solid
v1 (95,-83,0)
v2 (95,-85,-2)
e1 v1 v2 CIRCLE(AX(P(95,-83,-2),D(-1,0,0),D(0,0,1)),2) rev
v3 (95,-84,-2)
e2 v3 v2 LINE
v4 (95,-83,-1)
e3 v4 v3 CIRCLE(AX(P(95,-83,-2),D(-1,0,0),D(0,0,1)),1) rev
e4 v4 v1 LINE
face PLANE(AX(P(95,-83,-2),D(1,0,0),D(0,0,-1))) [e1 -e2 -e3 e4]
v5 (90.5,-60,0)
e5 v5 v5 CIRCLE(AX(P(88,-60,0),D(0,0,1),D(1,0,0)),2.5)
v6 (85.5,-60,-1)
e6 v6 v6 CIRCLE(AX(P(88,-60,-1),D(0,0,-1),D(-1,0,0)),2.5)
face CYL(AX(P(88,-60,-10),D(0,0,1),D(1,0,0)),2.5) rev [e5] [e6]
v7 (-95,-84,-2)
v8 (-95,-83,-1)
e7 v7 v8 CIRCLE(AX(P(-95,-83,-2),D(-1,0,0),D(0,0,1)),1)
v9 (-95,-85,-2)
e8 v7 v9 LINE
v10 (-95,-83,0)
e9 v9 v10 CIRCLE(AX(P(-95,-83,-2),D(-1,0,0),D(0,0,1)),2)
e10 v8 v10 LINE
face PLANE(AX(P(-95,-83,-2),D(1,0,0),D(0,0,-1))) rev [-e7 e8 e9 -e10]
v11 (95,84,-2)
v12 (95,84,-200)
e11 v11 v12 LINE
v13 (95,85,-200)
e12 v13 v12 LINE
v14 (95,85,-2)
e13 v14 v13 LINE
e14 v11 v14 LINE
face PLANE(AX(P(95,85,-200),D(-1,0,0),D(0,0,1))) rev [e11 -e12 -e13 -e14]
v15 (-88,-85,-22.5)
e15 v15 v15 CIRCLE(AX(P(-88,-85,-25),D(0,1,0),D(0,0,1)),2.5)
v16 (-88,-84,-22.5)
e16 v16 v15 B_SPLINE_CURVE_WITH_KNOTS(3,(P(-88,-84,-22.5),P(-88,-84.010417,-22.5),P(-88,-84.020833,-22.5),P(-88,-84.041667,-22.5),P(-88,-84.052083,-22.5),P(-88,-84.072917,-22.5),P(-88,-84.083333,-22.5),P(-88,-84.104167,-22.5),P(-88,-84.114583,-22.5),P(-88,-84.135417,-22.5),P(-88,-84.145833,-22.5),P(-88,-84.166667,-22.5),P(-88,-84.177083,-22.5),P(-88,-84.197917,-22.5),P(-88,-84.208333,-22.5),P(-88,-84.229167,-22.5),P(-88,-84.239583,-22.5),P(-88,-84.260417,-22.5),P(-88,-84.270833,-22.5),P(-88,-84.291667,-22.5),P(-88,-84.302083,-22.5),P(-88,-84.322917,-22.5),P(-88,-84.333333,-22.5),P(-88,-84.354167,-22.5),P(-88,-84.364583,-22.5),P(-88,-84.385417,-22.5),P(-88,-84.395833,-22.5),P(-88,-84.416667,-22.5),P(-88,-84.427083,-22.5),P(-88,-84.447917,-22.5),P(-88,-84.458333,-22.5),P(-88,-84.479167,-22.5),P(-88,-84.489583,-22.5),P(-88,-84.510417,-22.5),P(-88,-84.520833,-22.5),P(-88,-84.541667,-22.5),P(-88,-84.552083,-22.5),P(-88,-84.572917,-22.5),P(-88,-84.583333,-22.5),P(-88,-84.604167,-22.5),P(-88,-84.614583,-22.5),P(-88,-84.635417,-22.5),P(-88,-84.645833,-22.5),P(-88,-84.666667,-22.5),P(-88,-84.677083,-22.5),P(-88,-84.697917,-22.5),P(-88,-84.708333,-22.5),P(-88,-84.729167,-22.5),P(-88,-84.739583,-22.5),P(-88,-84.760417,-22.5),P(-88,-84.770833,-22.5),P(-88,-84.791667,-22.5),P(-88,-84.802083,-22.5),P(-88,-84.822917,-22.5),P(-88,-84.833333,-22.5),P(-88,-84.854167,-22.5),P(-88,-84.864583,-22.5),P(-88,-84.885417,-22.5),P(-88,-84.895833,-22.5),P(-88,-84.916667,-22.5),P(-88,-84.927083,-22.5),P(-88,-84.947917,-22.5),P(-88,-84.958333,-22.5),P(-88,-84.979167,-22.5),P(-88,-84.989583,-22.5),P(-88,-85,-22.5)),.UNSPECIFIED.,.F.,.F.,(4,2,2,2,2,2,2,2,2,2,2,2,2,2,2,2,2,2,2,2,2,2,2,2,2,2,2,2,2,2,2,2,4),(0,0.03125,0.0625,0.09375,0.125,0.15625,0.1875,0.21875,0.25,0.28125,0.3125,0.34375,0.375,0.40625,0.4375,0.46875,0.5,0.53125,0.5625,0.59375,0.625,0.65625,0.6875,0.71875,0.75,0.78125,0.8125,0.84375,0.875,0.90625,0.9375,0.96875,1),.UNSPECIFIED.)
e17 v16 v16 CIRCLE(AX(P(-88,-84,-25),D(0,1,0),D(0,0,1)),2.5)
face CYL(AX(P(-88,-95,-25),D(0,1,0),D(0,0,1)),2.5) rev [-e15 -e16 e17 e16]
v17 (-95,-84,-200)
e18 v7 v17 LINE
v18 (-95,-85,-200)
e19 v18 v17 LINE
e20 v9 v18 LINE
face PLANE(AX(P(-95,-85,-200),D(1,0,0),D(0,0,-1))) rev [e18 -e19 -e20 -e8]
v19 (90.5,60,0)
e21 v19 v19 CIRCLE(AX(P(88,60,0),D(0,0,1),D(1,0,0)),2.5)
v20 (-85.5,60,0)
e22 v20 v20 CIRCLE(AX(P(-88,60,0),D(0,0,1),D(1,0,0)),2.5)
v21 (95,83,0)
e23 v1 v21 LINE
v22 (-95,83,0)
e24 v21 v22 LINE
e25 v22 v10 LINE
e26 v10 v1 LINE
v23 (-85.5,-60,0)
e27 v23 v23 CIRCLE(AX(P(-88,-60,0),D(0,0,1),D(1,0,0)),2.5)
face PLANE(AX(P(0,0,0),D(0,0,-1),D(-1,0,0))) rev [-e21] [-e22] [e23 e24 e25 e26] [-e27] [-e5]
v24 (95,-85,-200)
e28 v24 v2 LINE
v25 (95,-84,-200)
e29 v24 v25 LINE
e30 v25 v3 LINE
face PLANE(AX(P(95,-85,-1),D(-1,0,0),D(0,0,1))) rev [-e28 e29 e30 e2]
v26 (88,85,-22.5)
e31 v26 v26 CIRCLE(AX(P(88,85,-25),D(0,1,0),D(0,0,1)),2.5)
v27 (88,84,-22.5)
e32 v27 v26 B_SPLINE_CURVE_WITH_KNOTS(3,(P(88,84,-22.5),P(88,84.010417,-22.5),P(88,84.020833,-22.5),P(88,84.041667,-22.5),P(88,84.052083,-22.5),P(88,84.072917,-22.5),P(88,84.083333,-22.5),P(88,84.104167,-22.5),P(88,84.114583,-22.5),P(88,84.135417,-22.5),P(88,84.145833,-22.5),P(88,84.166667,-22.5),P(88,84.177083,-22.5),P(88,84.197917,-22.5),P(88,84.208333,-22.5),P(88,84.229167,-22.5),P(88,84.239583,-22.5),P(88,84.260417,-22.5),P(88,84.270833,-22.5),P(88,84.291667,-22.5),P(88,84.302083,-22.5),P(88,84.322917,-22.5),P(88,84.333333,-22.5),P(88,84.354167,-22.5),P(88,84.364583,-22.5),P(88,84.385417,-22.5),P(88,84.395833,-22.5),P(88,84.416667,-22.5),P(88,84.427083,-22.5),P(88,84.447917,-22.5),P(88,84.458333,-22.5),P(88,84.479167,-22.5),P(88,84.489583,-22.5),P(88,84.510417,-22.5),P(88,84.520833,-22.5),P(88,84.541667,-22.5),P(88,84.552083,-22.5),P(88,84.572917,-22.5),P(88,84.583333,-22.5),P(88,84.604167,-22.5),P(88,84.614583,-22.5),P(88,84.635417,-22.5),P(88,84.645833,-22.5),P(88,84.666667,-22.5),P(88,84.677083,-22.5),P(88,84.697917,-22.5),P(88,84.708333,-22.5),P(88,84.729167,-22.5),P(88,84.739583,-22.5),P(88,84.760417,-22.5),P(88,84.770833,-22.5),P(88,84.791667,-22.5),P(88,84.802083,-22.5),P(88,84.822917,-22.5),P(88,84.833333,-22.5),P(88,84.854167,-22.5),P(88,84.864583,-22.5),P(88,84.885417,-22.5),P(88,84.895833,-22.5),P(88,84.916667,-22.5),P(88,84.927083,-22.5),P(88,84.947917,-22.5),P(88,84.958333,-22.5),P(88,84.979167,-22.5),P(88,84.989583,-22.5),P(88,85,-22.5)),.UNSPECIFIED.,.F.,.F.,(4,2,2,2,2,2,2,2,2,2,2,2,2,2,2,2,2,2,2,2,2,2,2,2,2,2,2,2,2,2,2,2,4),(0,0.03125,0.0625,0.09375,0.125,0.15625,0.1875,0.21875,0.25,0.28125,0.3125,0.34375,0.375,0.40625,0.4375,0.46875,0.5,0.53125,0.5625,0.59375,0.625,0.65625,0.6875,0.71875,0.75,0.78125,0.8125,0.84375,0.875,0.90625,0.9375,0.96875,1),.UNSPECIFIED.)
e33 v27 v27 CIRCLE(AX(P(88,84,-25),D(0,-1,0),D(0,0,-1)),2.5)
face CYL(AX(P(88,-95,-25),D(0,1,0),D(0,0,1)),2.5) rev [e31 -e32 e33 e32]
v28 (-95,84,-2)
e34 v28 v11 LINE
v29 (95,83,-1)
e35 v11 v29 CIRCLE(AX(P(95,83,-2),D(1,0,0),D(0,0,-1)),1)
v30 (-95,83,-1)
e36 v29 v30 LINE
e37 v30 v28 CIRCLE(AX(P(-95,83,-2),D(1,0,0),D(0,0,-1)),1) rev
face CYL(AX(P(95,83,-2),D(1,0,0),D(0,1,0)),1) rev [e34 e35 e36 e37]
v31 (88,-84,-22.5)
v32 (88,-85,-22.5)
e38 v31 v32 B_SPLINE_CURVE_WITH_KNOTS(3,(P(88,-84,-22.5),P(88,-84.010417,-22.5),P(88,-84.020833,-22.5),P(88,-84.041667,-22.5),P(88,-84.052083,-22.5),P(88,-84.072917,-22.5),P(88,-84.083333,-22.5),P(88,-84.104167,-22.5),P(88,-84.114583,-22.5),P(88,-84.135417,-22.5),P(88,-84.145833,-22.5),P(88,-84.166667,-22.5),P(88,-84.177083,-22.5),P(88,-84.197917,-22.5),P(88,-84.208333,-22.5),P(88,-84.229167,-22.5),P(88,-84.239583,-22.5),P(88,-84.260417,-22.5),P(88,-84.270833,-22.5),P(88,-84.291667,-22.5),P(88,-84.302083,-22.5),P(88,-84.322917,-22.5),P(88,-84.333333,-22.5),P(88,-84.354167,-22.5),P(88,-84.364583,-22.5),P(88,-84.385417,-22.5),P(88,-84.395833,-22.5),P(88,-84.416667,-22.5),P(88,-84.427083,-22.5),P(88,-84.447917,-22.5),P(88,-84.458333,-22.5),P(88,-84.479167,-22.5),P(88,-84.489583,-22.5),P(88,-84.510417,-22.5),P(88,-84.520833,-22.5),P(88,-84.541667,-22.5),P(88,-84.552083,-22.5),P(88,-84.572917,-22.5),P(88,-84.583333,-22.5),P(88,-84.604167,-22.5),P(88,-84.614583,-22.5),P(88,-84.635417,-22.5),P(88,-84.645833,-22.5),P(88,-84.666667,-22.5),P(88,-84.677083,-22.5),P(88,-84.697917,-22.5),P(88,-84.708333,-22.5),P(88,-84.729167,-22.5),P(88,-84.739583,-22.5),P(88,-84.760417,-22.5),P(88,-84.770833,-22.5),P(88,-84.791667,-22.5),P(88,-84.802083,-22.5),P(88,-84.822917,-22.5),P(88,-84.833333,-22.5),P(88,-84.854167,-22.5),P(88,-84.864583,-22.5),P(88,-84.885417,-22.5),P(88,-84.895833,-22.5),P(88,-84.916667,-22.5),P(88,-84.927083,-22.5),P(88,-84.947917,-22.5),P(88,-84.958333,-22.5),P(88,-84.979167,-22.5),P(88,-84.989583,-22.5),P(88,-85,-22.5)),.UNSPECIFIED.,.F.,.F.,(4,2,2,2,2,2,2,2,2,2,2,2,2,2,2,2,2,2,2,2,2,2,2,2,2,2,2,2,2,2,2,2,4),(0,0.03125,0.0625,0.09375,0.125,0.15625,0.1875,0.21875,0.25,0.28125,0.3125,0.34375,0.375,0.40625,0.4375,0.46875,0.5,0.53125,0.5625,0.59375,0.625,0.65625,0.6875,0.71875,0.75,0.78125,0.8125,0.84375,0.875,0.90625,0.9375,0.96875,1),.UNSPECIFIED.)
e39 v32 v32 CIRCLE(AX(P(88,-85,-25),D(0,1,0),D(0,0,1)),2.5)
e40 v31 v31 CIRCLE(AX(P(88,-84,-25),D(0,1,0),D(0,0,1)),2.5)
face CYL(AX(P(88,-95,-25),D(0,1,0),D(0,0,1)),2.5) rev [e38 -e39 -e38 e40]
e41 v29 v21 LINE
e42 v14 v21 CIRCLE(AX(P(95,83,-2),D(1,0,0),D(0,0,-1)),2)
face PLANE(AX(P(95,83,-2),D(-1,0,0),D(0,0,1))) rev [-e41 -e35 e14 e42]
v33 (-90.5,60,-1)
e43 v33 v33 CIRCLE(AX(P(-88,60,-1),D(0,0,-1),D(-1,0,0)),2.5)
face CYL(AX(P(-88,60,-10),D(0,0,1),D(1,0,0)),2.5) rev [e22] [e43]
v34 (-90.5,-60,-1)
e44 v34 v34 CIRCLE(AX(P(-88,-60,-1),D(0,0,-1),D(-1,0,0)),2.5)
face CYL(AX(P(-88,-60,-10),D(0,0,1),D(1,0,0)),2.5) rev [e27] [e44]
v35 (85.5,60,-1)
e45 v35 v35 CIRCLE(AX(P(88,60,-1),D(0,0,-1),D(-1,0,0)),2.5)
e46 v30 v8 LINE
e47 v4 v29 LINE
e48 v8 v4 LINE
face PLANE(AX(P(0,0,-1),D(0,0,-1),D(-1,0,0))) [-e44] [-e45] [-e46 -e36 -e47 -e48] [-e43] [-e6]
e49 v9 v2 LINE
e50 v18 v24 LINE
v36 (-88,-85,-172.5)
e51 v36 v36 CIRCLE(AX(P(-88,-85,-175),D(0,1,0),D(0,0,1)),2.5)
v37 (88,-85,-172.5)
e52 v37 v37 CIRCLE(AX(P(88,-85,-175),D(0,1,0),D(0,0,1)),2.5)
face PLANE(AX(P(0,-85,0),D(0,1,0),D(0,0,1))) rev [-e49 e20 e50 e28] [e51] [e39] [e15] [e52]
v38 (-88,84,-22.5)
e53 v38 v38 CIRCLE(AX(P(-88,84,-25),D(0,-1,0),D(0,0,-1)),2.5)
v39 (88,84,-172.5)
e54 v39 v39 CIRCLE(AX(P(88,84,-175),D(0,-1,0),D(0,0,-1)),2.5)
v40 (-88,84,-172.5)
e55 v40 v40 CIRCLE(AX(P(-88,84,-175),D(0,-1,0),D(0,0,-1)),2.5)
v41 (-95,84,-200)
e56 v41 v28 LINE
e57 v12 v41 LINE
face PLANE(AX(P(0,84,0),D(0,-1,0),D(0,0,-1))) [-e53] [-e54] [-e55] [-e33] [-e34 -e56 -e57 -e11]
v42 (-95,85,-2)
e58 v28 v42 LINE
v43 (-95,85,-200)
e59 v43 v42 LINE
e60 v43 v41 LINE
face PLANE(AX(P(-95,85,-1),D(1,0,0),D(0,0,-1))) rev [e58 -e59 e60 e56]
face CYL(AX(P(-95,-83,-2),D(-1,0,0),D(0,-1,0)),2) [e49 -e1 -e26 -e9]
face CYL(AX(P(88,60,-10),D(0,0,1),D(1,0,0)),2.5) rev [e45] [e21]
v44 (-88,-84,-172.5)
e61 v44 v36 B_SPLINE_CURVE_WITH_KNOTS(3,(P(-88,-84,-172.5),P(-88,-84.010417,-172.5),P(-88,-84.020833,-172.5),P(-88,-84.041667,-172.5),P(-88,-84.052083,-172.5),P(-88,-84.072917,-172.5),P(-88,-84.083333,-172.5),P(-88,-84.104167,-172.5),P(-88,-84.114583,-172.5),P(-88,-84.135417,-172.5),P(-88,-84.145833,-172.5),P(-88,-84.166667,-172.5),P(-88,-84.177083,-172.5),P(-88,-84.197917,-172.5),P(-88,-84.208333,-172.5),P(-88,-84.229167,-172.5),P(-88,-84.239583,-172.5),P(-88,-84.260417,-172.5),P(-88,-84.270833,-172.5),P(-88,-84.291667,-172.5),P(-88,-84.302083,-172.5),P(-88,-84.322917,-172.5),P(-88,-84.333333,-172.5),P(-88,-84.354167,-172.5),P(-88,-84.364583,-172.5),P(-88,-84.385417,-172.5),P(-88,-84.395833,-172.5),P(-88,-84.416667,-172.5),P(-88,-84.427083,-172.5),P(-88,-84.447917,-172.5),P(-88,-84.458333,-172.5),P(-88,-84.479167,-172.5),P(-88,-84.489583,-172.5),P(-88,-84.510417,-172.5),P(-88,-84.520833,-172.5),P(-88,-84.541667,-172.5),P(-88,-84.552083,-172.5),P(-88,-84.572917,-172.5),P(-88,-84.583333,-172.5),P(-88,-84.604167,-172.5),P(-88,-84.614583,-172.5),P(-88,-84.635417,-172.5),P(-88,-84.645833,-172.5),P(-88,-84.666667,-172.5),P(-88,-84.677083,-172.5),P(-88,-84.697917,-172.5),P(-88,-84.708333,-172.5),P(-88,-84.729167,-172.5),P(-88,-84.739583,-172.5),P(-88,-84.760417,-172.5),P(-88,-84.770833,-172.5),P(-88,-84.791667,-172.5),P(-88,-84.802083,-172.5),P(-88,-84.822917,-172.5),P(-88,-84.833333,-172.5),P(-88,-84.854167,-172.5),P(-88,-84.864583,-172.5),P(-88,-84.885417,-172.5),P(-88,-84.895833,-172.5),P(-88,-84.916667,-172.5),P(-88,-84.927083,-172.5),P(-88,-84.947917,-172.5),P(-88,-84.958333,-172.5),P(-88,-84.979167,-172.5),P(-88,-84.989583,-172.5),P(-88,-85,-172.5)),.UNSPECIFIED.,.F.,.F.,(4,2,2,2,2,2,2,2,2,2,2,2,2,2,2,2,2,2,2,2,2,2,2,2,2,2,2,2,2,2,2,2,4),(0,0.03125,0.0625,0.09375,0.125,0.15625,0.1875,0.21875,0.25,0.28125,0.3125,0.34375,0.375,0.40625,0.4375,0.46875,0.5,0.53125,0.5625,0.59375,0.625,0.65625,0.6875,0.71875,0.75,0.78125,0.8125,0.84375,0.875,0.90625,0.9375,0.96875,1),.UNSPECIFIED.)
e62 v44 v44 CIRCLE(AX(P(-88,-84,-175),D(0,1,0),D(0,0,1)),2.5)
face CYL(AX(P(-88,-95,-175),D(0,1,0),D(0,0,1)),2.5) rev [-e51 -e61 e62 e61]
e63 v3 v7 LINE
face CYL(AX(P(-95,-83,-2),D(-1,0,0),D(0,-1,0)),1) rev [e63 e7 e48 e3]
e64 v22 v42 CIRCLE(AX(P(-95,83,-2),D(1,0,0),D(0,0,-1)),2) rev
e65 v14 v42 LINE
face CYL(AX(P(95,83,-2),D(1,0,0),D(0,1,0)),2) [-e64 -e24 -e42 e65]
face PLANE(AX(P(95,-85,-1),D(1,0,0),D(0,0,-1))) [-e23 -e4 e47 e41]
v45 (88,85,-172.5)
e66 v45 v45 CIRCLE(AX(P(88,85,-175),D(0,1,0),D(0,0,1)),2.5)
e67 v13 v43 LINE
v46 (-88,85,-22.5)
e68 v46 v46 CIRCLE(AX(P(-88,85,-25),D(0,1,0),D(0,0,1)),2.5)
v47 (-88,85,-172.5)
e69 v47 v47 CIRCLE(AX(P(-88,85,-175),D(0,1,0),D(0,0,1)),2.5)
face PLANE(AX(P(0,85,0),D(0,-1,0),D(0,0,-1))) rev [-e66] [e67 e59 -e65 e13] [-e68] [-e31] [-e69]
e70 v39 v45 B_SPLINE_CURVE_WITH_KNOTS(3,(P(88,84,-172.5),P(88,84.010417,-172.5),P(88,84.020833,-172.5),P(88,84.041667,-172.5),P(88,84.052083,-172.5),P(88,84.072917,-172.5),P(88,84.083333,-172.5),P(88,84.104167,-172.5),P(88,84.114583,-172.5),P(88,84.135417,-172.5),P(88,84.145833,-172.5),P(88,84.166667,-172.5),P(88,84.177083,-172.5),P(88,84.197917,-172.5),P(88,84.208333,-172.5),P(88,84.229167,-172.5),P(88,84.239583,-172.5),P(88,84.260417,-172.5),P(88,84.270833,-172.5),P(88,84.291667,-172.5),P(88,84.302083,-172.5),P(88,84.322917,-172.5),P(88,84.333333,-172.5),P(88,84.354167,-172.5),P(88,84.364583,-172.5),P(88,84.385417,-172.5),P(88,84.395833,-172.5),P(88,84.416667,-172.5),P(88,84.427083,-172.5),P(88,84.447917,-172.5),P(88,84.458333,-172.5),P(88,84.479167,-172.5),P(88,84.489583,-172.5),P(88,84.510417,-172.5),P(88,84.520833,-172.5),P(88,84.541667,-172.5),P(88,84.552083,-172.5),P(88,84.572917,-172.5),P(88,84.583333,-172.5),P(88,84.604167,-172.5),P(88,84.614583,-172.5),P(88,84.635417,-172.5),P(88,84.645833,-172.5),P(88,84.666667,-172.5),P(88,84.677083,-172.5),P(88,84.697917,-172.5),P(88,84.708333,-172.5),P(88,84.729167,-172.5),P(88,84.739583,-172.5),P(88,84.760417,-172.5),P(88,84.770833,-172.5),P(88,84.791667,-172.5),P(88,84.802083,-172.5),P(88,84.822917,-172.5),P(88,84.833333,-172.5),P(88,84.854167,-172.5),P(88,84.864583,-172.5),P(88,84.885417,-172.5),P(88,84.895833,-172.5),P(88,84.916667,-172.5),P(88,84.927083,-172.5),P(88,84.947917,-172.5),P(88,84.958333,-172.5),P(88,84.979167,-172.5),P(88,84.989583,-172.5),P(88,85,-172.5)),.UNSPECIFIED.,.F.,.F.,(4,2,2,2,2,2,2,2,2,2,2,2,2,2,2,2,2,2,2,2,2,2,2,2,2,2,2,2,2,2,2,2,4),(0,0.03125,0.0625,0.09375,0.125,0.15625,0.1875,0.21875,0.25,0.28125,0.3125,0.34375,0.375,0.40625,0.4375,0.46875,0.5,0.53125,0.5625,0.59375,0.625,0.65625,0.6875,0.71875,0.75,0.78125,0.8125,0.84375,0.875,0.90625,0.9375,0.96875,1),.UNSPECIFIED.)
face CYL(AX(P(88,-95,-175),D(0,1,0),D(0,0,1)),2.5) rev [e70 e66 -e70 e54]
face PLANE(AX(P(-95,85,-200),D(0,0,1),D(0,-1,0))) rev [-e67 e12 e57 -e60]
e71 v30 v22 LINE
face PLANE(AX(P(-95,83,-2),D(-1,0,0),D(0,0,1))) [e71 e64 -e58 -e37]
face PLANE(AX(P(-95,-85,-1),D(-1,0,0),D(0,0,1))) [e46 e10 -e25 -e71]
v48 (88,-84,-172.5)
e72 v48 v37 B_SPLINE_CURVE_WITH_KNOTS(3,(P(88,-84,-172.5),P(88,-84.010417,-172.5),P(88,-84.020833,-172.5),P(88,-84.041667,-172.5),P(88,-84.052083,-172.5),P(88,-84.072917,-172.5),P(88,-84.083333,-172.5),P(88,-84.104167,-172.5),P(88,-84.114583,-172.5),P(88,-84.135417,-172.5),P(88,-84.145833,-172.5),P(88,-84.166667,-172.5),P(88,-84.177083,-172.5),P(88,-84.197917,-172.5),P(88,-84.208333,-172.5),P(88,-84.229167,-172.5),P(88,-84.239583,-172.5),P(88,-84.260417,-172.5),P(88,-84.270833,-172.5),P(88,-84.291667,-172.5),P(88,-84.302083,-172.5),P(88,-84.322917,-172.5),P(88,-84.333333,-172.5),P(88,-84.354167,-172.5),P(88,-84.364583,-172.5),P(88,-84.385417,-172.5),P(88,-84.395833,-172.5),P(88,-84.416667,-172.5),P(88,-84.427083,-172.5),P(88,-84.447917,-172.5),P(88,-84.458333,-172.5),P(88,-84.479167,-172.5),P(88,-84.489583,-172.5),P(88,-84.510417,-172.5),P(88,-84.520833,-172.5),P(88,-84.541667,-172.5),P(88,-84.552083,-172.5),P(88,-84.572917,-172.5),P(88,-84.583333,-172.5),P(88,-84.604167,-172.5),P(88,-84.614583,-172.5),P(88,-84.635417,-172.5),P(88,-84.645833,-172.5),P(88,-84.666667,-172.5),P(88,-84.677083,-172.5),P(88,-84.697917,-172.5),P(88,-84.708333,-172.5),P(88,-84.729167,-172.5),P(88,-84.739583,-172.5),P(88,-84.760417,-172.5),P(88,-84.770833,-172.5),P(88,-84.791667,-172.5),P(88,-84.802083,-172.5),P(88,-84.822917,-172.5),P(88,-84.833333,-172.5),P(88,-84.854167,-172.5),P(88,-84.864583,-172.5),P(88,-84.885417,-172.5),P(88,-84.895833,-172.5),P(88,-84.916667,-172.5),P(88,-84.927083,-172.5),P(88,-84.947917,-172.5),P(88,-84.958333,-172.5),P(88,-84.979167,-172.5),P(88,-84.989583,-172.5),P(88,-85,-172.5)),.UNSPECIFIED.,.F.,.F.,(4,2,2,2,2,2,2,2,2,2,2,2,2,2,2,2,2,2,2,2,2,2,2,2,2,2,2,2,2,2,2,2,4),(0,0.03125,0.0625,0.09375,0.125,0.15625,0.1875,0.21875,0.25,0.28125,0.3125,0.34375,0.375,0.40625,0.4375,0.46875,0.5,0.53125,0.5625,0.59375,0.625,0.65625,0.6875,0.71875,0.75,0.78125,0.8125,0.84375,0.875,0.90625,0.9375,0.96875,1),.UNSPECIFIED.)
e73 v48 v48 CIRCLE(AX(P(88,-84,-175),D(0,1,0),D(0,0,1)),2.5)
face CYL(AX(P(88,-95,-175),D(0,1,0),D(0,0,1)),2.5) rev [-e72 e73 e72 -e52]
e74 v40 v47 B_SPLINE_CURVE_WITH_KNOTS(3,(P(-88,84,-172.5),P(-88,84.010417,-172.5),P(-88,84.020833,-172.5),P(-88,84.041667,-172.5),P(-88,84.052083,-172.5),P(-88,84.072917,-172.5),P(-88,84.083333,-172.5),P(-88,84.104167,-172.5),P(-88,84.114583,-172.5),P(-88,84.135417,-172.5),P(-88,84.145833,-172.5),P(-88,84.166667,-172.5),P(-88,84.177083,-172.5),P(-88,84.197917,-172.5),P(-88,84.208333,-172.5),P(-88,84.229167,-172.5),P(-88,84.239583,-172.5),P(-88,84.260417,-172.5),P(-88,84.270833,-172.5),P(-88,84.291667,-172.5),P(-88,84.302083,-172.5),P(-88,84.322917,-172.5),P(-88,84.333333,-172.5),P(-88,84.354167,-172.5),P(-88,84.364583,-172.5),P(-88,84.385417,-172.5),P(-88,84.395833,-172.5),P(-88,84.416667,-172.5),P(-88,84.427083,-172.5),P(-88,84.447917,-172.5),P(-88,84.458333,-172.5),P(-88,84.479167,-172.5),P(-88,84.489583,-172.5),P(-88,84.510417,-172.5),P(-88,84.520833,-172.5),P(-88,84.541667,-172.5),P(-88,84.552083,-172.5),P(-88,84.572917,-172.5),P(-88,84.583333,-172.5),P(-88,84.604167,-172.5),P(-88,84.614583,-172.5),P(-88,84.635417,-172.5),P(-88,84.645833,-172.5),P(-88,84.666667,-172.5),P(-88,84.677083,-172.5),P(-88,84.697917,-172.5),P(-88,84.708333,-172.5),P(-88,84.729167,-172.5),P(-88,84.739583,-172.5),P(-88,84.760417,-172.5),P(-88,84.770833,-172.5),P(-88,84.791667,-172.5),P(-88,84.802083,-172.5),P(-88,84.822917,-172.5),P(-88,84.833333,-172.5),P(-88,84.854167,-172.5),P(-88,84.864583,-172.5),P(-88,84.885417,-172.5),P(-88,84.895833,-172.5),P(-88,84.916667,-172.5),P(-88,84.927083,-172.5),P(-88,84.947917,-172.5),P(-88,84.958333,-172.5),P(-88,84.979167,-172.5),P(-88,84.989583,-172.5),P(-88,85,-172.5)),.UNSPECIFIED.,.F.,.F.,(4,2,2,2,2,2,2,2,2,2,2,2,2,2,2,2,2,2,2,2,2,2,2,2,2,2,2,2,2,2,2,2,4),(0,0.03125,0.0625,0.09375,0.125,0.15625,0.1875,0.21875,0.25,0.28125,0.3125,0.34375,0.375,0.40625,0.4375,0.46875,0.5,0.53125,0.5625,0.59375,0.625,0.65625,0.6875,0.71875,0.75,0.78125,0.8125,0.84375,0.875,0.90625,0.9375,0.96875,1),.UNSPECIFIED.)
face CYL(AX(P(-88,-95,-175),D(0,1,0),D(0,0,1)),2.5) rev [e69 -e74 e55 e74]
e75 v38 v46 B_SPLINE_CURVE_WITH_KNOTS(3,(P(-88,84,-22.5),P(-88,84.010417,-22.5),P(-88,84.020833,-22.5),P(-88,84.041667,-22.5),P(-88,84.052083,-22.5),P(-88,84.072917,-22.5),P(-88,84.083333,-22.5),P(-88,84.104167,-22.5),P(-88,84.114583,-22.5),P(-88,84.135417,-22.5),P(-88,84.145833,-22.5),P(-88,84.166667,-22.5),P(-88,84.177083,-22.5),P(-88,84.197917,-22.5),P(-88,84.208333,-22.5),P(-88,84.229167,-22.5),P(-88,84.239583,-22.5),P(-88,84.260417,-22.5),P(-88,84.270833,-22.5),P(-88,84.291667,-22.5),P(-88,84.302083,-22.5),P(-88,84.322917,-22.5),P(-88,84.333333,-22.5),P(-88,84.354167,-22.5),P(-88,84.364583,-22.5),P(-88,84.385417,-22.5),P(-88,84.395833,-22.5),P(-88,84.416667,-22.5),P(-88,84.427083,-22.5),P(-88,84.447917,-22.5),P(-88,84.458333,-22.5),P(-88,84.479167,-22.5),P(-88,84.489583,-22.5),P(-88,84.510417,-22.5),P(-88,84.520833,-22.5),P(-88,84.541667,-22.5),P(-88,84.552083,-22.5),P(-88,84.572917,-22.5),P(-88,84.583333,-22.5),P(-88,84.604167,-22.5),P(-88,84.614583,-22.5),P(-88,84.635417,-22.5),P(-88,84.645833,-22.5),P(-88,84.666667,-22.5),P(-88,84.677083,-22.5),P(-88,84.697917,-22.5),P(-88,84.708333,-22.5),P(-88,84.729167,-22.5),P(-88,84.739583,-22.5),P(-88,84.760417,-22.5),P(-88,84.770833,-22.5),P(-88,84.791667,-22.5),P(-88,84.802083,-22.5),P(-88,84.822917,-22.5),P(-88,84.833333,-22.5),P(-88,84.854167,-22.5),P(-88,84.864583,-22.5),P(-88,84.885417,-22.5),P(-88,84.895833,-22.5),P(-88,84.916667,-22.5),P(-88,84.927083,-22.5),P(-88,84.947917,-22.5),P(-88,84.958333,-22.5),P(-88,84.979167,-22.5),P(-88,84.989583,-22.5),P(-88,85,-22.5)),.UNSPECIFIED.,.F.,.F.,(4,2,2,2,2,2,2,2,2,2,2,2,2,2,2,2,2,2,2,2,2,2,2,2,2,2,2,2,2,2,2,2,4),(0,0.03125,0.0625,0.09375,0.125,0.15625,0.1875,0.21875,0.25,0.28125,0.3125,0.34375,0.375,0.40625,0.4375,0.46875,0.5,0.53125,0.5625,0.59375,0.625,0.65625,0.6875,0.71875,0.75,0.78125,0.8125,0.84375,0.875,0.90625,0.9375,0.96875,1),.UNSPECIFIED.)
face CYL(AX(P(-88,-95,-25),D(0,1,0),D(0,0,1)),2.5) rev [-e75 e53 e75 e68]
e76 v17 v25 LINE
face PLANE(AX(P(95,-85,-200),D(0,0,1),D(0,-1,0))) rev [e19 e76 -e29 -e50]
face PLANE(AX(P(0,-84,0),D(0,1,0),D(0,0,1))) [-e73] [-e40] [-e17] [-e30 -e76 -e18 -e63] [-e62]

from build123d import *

# Parameters (mm, degrees)
SKETCH1_W                      = 190
SKETCH1_H                      = 170
BASE_FLANGE1_DEPTH             = 1
SKETCH23_R                     = 2.5
CUT_EXTRUDE1_DEPTH             = 10
EDGE_FLANGE5_STRIP_W           = 6
EDGE_FLANGE5_STRIP_H           = 1
EDGE_FLANGE5_STRIP_CUT_DEPTH   = 190
EDGE_FLANGE5_STRIP_2_W         = 6
EDGE_FLANGE5_STRIP_2_H         = 1
EDGE_FLANGE5_STRIP_CUT_2_DEPTH = 190
EDGE_FLANGE5_DEPTH             = 190
EDGE_FLANGE5_BEND_DEPTH        = 190
SKETCH44_R                     = 2.5
CUT_EXTRUDE2_DEPTH             = 180


# Sheet-metal steps are written as plain solids
with BuildPart() as part:
    # Sketch1 → Base-Flange1 (new body)
    with BuildSketch(Plane.XY):
        Rectangle(SKETCH1_W, SKETCH1_H)
    extrude(amount=-BASE_FLANGE1_DEPTH)

    # Sketch23 → Cut-Extrude1 (cut)
    with BuildSketch(Plane.XY):
        with Locations((-88, 60)):
            Circle(SKETCH23_R)
        with Locations((88, 60)):
            Circle(SKETCH23_R)
        with Locations((88, -60)):
            Circle(SKETCH23_R)
        with Locations((-88, -60)):
            Circle(SKETCH23_R)
    extrude(amount=-CUT_EXTRUDE1_DEPTH, mode=Mode.SUBTRACT)

    # Edge-Flange5 strip (across the edge) → Edge-Flange5 strip cut (cut)
    with BuildSketch(Plane(origin=(-95, 85, -1), x_dir=(0, -1, 0), z_dir=(1, 0, 0))):
        with Locations((-1, -0.5)):
            Rectangle(EDGE_FLANGE5_STRIP_W, EDGE_FLANGE5_STRIP_H)
    extrude(amount=EDGE_FLANGE5_STRIP_CUT_DEPTH, mode=Mode.SUBTRACT)

    # Edge-Flange5 strip 2 (across the edge) → Edge-Flange5 strip cut 2 (cut)
    with BuildSketch(Plane(origin=(95, -85, -1), x_dir=(0, 1, 0), z_dir=(-1, 0, 0))):
        with Locations((-1, -0.5)):
            Rectangle(EDGE_FLANGE5_STRIP_2_W, EDGE_FLANGE5_STRIP_2_H)
    extrude(amount=EDGE_FLANGE5_STRIP_CUT_2_DEPTH, mode=Mode.SUBTRACT)

    # Edge-Flange5 section (across the edge) → Edge-Flange5 (add)
    with BuildSketch(Plane(origin=(-95, 85, -1), x_dir=(0, -1, 0), z_dir=(1, 0, 0))):
        with BuildLine():
            Line((0, 1), (0, 199))
            Line((0, 199), (1, 199))
            Line((1, 199), (1, 1))
            ThreePointArc((1, 1), (1.292893219, 0.292893219), (2, 0))
            Line((2, 0), (2, -1))
            ThreePointArc((2, -1), (0.585786438, -0.414213562), (0, 1))
        make_face()
    extrude(amount=EDGE_FLANGE5_DEPTH)

    # Edge-Flange5 section 2 (across the edge) → Edge-Flange5 bend (add)
    with BuildSketch(Plane(origin=(95, -85, -1), x_dir=(0, 1, 0), z_dir=(-1, 0, 0))):
        with BuildLine():
            Line((0, 1), (0, 199))
            Line((0, 199), (1, 199))
            Line((1, 199), (1, 1))
            ThreePointArc((1, 1), (1.292893219, 0.292893219), (2, 0))
            Line((2, 0), (2, -1))
            ThreePointArc((2, -1), (0.585786438, -0.414213562), (0, 1))
        make_face()
    extrude(amount=EDGE_FLANGE5_BEND_DEPTH)

    # Sketch44 → Cut-Extrude2 (cut)
    with BuildSketch(Plane(origin=(0, 85, 0), x_dir=(1, 0, 0), z_dir=(0, 1, 0))):
        with Locations(Location((-88, 175, 0), (0, 0, 270))):
            Circle(SKETCH44_R)
        with Locations(Location((88, 175, 0), (0, 0, 270))):
            Circle(SKETCH44_R)
        with Locations(Location((88, 25, 0), (0, 0, 270))):
            Circle(SKETCH44_R)
        with Locations(Location((-88, 25, 0), (0, 0, 270))):
            Circle(SKETCH44_R)
    extrude(amount=-CUT_EXTRUDE2_DEPTH, mode=Mode.SUBTRACT)


solid = part.part
